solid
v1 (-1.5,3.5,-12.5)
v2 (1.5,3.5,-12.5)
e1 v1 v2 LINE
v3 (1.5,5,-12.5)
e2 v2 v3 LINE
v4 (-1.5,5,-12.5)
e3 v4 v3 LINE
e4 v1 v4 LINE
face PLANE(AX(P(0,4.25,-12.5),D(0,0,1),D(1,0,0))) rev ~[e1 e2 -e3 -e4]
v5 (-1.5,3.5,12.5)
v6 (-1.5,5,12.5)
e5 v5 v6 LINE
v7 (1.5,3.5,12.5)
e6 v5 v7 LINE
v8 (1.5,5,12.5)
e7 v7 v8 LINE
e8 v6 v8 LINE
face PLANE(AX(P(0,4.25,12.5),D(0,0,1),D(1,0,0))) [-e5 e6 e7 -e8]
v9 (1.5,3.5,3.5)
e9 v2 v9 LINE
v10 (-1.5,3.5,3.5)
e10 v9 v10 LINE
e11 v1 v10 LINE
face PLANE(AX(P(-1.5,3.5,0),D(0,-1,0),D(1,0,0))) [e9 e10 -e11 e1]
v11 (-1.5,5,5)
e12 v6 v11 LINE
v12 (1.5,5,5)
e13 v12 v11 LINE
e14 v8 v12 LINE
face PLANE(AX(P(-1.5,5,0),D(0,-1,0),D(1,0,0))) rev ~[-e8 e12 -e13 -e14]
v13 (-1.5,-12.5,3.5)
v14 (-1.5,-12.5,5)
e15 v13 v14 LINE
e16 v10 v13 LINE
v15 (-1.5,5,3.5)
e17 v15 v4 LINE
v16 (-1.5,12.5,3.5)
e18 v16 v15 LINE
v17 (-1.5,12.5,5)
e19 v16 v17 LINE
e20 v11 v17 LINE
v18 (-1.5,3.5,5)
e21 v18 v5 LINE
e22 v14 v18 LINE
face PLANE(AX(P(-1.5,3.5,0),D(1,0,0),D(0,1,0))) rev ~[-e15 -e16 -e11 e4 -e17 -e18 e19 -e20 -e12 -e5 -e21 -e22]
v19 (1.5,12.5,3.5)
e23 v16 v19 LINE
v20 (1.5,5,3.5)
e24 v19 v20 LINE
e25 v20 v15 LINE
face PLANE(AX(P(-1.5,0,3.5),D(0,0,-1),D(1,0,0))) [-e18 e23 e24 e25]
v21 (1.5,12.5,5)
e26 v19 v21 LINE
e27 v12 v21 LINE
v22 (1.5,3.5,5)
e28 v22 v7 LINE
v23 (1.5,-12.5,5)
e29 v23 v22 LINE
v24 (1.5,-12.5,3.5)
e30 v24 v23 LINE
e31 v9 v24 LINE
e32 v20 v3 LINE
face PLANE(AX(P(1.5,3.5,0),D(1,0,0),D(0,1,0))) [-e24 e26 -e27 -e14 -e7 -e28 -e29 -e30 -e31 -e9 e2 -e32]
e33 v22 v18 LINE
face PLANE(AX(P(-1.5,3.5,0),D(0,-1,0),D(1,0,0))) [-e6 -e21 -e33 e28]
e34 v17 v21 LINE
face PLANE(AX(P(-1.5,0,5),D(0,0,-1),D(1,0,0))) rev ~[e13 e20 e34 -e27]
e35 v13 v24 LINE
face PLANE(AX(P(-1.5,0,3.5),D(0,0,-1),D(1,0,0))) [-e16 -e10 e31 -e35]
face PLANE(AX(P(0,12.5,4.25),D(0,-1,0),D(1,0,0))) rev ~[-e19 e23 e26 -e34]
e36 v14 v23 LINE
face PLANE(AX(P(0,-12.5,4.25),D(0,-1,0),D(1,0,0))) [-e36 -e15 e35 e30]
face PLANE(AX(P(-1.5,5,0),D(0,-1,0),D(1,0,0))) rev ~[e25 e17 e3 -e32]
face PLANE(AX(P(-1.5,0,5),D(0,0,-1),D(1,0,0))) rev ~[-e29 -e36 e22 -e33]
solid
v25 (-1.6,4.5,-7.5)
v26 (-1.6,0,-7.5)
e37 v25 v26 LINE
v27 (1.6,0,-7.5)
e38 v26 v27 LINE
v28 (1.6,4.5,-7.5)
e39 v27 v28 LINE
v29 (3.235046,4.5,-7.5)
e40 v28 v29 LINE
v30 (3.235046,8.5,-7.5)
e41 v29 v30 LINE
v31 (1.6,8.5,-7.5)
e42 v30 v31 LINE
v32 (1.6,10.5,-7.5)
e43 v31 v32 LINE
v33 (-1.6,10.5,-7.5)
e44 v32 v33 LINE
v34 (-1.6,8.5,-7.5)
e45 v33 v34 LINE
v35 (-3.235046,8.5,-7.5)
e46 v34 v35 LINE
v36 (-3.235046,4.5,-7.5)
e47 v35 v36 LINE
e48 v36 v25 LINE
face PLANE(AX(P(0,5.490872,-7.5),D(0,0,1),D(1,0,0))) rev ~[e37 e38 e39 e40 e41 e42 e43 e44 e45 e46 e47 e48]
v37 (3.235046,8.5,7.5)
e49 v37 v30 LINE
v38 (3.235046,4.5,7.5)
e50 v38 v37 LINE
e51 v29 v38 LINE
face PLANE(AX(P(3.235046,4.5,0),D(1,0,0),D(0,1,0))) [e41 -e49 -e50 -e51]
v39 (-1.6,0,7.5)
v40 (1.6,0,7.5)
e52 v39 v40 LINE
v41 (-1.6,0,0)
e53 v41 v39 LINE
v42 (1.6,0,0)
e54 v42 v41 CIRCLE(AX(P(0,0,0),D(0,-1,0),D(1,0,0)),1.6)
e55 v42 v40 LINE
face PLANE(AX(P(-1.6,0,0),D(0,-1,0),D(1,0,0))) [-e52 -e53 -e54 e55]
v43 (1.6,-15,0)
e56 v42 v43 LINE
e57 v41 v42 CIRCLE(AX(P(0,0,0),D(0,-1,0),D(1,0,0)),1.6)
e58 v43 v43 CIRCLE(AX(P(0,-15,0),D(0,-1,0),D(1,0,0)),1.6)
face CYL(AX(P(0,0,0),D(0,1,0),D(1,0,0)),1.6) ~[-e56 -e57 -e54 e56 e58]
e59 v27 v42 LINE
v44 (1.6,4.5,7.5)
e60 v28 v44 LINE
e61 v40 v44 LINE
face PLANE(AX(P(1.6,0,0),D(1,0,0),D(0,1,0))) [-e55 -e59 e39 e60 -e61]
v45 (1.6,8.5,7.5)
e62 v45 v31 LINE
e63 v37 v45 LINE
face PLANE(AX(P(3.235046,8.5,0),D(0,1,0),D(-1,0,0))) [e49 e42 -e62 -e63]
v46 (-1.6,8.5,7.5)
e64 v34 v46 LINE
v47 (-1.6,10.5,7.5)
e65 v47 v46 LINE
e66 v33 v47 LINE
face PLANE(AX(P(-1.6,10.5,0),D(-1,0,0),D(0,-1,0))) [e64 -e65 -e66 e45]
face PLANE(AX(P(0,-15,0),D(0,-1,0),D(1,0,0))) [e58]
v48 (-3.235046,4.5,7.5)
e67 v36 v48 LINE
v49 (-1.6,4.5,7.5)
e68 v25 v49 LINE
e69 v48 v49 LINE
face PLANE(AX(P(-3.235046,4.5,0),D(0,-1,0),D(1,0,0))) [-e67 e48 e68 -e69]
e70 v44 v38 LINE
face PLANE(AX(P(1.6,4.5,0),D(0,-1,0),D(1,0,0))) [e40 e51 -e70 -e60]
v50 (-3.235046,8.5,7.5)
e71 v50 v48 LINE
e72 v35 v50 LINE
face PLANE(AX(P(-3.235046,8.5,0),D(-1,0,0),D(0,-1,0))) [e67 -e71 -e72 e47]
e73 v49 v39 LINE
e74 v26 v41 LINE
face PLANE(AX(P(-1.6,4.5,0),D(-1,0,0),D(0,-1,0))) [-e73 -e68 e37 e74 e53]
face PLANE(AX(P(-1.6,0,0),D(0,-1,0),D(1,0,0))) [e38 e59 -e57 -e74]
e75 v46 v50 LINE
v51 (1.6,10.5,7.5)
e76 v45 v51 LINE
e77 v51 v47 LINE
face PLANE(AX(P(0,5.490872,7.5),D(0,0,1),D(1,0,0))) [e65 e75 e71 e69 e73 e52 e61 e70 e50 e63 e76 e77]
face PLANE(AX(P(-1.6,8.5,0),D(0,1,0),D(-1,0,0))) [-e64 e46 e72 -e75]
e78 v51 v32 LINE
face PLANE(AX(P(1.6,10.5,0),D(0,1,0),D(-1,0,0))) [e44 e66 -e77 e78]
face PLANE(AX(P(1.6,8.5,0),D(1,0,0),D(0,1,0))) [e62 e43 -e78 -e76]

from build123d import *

# Parameters (mm, degrees)
F1_DEPTH = 7.5
F2_R     = 1.6
F3_DEPTH = 15
F4_W     = 3
F4_H     = 1.5
F5_DEPTH = 12.5
F6_W     = 3
F6_H     = 1.5
F7_DEPTH = 12.5


with BuildPart() as f1:
    # F0 (on Top) → F1 (new body, symmetric)
    with BuildSketch(Plane.XY):
        Polygon((1.6, 10.5), (0, 10.5), (-1.6, 10.5), (-1.6, 8.5), (-3.2350461341, 8.5), (-3.2350461341, 4.5), (-1.6, 4.5), (-1.6, 0), (0, 0), (1.6, 0), (1.6, 4.5), (3.2350461341, 4.5), (3.2350461341, 8.5), (1.6, 8.5), align=None)
    extrude(amount=F1_DEPTH, both=True)

    # F2 (on Front) → F3 (join)
    with BuildSketch(Plane.XZ):
        Circle(F2_R)
    extrude(amount=F3_DEPTH)


with BuildPart() as f5:
    # F4 (on Front) → F5 (new body, symmetric)
    with BuildSketch(Plane.XZ):
        with Locations((0, 4.25)):
            Rectangle(F4_W, F4_H)
    extrude(amount=F5_DEPTH, both=True)

    # F6 (on Top) → F7 (join, symmetric)
    with BuildSketch(Plane.XY):
        with Locations((0, 4.25)):
            Rectangle(F6_W, F6_H)
    extrude(amount=F7_DEPTH, both=True)


solid = Compound([f1.part, f5.part])
